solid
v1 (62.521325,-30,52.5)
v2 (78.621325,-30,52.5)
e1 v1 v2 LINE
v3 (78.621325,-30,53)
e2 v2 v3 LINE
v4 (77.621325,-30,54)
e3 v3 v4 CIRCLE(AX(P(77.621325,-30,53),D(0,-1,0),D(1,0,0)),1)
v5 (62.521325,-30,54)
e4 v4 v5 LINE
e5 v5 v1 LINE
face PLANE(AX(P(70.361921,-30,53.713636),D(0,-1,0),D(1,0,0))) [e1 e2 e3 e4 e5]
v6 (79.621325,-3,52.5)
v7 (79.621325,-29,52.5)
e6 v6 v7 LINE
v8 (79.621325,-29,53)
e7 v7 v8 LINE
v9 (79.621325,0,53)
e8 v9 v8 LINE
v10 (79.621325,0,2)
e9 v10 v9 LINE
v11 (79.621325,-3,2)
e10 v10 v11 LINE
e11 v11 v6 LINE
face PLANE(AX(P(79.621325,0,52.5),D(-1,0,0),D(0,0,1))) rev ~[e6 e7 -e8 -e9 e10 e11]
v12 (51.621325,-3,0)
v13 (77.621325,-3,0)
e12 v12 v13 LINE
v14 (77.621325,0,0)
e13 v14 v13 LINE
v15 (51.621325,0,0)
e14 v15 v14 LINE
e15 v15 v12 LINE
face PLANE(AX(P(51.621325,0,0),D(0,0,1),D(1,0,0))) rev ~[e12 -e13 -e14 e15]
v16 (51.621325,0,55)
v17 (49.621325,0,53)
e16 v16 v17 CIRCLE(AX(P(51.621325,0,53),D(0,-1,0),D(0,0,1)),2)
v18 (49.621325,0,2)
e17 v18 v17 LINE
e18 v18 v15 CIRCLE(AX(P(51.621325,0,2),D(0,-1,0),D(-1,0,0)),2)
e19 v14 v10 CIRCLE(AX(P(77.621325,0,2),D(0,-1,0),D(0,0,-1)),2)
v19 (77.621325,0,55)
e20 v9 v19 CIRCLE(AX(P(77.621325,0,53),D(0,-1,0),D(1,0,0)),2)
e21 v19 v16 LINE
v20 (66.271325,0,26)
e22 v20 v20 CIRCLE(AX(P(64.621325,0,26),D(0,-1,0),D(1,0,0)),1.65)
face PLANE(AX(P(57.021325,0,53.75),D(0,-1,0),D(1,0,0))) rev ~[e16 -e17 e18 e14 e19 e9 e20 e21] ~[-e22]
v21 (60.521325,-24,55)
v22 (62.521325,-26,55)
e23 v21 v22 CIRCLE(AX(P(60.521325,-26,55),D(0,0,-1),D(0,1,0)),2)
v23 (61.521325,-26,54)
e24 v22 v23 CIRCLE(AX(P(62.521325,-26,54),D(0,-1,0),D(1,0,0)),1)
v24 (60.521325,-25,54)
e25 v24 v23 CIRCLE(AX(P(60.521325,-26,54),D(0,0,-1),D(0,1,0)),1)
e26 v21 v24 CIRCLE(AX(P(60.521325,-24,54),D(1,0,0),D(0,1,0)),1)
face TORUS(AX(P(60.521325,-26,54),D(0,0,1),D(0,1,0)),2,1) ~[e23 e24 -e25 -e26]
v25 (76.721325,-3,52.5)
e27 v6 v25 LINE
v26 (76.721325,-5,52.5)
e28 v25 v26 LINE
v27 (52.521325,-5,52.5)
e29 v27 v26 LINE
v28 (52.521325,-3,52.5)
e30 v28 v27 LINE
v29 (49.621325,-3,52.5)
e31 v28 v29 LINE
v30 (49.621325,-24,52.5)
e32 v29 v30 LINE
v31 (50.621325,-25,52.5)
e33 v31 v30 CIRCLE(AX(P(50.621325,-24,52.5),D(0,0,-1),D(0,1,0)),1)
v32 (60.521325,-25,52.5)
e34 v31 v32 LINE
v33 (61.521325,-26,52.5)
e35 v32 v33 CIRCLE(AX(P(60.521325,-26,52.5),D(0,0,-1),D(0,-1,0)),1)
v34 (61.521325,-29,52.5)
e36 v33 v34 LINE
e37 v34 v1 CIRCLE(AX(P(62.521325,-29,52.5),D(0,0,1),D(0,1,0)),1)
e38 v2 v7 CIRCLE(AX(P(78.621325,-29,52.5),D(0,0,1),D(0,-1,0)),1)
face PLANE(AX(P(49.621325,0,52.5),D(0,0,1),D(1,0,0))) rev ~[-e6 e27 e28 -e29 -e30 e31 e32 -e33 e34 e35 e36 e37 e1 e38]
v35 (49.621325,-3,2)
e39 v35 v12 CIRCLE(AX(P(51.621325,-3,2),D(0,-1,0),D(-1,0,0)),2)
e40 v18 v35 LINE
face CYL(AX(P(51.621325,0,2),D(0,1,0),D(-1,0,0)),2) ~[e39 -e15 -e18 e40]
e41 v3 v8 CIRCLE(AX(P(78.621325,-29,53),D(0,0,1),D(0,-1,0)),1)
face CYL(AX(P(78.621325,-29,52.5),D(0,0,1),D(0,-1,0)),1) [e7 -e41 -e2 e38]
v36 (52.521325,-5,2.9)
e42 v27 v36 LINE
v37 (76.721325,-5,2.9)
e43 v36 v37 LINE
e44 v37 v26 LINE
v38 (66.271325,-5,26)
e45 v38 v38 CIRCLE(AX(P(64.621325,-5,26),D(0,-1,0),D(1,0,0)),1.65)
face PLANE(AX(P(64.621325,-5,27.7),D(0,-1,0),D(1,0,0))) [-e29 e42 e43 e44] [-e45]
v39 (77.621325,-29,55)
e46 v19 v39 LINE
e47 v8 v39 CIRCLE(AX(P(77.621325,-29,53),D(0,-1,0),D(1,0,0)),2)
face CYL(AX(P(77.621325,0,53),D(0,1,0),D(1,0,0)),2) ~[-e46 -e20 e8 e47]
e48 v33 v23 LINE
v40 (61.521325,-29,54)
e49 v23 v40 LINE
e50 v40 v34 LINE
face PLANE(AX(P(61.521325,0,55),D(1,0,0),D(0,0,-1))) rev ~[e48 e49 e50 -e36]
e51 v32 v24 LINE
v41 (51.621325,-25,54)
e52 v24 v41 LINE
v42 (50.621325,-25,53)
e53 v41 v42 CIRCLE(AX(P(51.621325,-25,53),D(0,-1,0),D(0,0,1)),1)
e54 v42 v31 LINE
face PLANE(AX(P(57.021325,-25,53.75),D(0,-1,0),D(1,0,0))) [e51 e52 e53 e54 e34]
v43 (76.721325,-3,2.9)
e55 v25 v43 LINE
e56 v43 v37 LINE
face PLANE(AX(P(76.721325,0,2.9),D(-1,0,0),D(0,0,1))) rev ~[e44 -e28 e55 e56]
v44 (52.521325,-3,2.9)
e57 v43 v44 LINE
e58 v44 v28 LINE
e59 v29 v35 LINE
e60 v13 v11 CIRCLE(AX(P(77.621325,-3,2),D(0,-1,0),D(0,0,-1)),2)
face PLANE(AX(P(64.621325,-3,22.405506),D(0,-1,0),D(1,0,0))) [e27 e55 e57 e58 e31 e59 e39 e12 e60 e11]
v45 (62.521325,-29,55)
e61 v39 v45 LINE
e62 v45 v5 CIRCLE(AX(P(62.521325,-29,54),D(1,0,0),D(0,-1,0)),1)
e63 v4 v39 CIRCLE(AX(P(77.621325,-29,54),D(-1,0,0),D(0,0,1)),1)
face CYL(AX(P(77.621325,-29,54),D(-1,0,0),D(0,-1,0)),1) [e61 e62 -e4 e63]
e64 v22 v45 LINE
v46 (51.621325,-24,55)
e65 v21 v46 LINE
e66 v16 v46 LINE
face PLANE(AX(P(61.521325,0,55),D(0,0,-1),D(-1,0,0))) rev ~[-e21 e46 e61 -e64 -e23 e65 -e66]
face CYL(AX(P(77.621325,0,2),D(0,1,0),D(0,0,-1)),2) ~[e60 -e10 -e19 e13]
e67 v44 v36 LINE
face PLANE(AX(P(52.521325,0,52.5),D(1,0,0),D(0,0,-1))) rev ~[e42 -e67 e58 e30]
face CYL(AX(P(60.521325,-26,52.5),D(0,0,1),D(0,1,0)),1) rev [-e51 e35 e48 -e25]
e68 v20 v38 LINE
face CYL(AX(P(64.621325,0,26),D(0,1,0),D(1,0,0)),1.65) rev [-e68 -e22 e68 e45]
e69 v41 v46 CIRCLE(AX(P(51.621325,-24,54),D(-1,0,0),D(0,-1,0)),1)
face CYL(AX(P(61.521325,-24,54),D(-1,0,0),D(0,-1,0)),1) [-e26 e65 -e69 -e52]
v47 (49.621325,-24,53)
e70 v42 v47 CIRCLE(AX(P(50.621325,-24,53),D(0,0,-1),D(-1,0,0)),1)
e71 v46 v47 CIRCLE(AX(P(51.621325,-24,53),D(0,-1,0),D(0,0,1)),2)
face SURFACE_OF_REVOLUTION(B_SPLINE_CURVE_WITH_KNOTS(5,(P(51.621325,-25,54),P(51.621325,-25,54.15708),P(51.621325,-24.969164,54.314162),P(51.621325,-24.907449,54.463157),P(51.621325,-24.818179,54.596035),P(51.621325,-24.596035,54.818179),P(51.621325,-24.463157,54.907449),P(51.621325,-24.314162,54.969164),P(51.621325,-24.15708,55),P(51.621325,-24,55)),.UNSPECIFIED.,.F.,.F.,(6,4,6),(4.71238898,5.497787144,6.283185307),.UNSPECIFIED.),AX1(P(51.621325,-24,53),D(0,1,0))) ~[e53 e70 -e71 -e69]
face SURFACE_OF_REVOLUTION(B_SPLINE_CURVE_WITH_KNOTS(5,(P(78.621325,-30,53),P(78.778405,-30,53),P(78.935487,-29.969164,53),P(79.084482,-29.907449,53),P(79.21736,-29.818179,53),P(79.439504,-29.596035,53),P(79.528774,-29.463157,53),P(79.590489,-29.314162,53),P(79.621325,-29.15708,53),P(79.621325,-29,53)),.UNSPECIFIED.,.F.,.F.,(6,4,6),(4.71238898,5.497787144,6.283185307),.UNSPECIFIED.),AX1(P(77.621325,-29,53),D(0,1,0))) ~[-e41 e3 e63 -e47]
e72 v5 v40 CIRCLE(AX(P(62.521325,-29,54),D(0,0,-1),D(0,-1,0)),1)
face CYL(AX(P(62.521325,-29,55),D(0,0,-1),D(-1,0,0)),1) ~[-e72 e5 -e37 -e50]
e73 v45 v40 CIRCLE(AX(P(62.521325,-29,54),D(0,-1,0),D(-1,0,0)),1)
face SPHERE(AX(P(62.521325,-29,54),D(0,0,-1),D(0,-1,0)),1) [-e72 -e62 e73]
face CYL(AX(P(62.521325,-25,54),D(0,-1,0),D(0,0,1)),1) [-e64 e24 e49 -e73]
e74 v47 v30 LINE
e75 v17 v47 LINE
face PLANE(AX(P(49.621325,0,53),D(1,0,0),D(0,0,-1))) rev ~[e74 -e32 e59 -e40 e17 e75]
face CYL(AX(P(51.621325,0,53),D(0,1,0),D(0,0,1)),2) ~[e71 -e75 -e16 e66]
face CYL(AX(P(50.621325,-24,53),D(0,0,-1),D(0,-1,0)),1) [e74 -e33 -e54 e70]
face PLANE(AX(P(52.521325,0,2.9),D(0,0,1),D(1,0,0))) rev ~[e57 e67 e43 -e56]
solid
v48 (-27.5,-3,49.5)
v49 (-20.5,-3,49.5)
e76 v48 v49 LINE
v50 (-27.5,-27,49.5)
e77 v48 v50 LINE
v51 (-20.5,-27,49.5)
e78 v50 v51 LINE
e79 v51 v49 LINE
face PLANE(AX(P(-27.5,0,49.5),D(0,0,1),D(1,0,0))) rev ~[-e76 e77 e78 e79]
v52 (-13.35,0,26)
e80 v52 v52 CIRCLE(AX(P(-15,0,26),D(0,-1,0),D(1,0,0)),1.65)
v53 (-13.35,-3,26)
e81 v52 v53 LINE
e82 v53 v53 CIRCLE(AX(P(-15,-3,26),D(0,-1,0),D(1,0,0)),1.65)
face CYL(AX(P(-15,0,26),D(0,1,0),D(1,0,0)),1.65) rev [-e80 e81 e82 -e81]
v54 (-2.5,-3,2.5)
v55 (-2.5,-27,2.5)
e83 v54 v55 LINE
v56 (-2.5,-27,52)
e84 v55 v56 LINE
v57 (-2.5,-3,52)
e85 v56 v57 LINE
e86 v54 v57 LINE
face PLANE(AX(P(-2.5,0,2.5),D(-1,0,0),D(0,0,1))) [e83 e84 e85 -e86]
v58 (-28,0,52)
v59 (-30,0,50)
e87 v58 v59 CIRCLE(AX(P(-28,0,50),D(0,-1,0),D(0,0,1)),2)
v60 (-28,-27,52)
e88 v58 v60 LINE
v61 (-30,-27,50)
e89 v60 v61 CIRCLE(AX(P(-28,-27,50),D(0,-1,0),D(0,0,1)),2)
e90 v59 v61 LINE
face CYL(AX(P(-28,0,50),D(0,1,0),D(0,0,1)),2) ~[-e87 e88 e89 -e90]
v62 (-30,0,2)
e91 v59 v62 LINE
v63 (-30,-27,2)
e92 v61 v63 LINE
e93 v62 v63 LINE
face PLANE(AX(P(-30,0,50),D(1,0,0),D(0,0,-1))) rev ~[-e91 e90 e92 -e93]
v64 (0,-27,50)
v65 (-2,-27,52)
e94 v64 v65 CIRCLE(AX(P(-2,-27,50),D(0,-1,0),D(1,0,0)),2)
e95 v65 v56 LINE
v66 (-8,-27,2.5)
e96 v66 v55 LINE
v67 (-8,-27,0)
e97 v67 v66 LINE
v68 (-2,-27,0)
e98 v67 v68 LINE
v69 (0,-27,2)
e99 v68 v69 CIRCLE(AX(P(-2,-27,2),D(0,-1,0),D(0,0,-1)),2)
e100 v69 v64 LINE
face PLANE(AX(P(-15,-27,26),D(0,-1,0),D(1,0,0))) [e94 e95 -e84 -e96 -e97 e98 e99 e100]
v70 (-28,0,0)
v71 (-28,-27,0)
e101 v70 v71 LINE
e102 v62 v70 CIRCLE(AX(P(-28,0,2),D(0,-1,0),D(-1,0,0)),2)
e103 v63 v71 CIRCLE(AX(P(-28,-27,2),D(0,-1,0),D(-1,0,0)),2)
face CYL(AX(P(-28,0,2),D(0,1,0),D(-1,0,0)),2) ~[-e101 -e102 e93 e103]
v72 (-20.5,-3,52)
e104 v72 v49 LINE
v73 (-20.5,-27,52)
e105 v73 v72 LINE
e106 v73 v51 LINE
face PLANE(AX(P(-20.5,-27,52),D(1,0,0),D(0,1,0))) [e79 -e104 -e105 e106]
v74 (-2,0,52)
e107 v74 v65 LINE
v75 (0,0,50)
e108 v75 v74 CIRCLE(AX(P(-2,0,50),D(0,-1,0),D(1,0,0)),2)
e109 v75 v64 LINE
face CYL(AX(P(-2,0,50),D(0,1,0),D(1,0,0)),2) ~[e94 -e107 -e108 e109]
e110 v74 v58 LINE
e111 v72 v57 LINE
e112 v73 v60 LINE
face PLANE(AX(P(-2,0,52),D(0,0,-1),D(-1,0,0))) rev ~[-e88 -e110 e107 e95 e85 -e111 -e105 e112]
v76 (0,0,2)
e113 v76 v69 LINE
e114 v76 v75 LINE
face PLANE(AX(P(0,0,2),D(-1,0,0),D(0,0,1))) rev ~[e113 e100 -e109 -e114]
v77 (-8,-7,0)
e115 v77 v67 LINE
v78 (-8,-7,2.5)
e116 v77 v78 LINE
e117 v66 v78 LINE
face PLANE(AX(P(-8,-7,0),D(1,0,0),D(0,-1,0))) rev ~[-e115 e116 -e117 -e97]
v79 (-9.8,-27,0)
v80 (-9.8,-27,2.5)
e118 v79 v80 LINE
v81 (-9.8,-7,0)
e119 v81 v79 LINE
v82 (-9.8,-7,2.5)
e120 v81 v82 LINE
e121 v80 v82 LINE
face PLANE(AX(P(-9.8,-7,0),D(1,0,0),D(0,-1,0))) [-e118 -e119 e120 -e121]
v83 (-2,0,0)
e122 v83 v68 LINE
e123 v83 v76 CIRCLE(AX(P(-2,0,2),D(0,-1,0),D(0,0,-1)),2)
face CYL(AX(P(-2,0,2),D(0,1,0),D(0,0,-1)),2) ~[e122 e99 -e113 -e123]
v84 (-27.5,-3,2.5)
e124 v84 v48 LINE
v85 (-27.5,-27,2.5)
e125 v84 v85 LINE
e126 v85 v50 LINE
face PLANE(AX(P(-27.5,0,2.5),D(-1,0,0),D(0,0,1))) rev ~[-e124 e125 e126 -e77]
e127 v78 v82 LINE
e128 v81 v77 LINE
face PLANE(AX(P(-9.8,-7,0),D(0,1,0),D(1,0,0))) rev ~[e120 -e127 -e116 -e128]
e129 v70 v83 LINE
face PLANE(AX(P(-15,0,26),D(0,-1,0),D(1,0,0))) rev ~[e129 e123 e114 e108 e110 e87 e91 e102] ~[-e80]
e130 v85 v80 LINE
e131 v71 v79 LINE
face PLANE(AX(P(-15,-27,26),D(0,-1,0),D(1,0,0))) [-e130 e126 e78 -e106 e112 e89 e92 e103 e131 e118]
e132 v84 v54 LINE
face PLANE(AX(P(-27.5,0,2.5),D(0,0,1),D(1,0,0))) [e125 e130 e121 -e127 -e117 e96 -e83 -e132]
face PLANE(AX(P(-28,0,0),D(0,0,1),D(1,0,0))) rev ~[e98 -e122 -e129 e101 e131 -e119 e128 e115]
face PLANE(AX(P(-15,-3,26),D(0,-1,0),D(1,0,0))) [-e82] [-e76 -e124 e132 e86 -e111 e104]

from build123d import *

# Parameters (mm, degrees)
F0_W      = 25
F0_H      = 47
F1_DEPTH  = 27
F0_R      = 1.65
F2_DEPTH  = 3
F3_W      = 1.8
F3_H      = 20
F4_DEPTH  = 25
F5_W      = 18
F5_H      = 24
F6_DEPTH  = 25
F8_DEPTH  = 3
F7_R      = 1.65
F9_DEPTH  = 5
F10_DEPTH = 30
F7_W      = 9
F7_H      = 2.5
F11_DEPTH = 25
F12_R     = 1


with BuildPart() as f1:
    # F0 (on Front) → F1 (new body)
    with BuildSketch(Plane.XZ):
        with BuildLine():
            Line((-28, 0), (-2, 0))
            ThreePointArc((-2, 0), (-0.5857864376, 0.5857864376), (0, 2))
            Line((0, 2), (0, 50))
            ThreePointArc((0, 50), (-0.5857864376, 51.4142135624), (-2, 52))
            Line((-2, 52), (-28, 52))
            ThreePointArc((-28, 52), (-29.4142135624, 51.4142135624), (-30, 50))
            Line((-30, 50), (-30, 2))
            ThreePointArc((-30, 2), (-29.4142135624, 0.5857864376), (-28, 0))
        make_face()
        with Locations((-15, 26)):
            Rectangle(F0_W, F0_H, mode=Mode.SUBTRACT)
    extrude(amount=F1_DEPTH)

    # F0 (on Front) → F2 (join)
    with BuildSketch(Plane.XZ):
        with Locations((-15, 26)):
            Rectangle(F0_W, F0_H)
        with Locations((-15, 26)):
            Circle(F0_R, mode=Mode.SUBTRACT)
    extrude(amount=F2_DEPTH)

    # F3 (on face) → F4 (cut)
    with BuildSketch(Plane(origin=(0, 0, 0), x_dir=(1, 0, 0), z_dir=(0, 0, -1))):
        with Locations((-8.9, 17)):
            Rectangle(F3_W, F3_H)
    extrude(amount=-F4_DEPTH, mode=Mode.SUBTRACT)

    # F5 (on face) → F6 (cut)
    with BuildSketch(Plane.XY.offset(52)):
        with Locations((-11.5, -15)):
            Rectangle(F5_W, F5_H)
    extrude(amount=-F6_DEPTH, mode=Mode.SUBTRACT)


with BuildPart() as f8:
    # F7 (on Front) → F8 (new body)
    with BuildSketch(Plane.XZ):
        with BuildLine():
            ThreePointArc((49.6213248736, 2), (50.2071113112, 0.5857864376), (51.6213248736, 0))
            Line((51.6213248736, 0), (77.6213248736, 0))
            ThreePointArc((77.6213248736, 0), (79.035538436, 0.5857864376), (79.6213248736, 2))
            Line((79.6213248736, 2), (79.6213248736, 50))
            Line((79.6213248736, 50), (79.6213248736, 52))
            Line((79.6213248736, 52), (79.6213248736, 52.5))
            Line((79.6213248736, 52.5), (76.7213248736, 52.5))
            Line((76.7213248736, 52.5), (76.7213248736, 49.1))
            Line((76.7213248736, 49.1), (76.7213248736, 2.9))
            Line((76.7213248736, 2.9), (52.5213248736, 2.9))
            Line((52.5213248736, 2.9), (52.5213248736, 49.1))
            Line((52.5213248736, 49.1), (52.5213248736, 52))
            Line((52.5213248736, 52), (52.5213248736, 52.5))
            Line((52.5213248736, 52.5), (49.6213248736, 52.5))
            Line((49.6213248736, 52.5), (49.6213248736, 52))
            Line((49.6213248736, 52), (49.6213248736, 50))
            Line((49.6213248736, 50), (49.6213248736, 2))
        make_face()
    extrude(amount=F8_DEPTH)

    # F7 (on Front) → F9 (join)
    with BuildSketch(Plane.XZ):
        Polygon((61.5213248736, 52.5), (52.5213248736, 52.5), (52.5213248736, 52), (52.5213248736, 49.1), (52.5213248736, 2.9), (76.7213248736, 2.9), (76.7213248736, 49.1), (76.7213248736, 52.5), align=None)
        with Locations((64.6213248736, 26)):
            Circle(F7_R, mode=Mode.SUBTRACT)
    extrude(amount=F9_DEPTH)

    # F7 (on Front) → F10 (join)
    with BuildSketch(Plane.XZ):
        with BuildLine():
            Line((76.7213248736, 52.5), (79.6213248736, 52.5))
            Line((79.6213248736, 52.5), (79.6213248736, 53))
            ThreePointArc((79.6213248736, 53), (79.035538436, 54.4142135624), (77.6213248736, 55))
            Line((77.6213248736, 55), (61.5213248736, 55))
            Line((61.5213248736, 55), (61.5213248736, 52.5))
            Line((61.5213248736, 52.5), (76.7213248736, 52.5))
        make_face()
    extrude(amount=F10_DEPTH)

    # F7 (on Front) → F11 (join)
    with BuildSketch(Plane.XZ):
        with Locations((57.0213248736, 53.75)):
            Rectangle(F7_W, F7_H)
        with BuildLine():
            Line((49.6213248736, 53), (49.6213248736, 52.5))
            Line((49.6213248736, 52.5), (52.5213248736, 52.5))
            Line((52.5213248736, 52.5), (52.5213248736, 55))
            Line((52.5213248736, 55), (51.6213248736, 55))
            ThreePointArc((51.6213248736, 55), (50.2071113112, 54.4142135624), (49.6213248736, 53))
        make_face()
    extrude(amount=F11_DEPTH)

    # F12
    f12_edges = [f8.edges().sort_by_distance(p)[0] for p in [
        (61.521325, -25, 53.75),
        (61.521325, -30, 53.75),
        (50.207111, -25, 54.414214),
        (79.035538, -30, 54.414214),
        (49.621325, -25, 52.75),
        (79.621325, -30, 52.75),
        (69.571325, -30, 55),
        (61.521325, -27.5, 55),
        (56.571325, -25, 55),
    ]]
    fillet(f12_edges, radius=F12_R)


solid = Compound([f1.part, f8.part])
